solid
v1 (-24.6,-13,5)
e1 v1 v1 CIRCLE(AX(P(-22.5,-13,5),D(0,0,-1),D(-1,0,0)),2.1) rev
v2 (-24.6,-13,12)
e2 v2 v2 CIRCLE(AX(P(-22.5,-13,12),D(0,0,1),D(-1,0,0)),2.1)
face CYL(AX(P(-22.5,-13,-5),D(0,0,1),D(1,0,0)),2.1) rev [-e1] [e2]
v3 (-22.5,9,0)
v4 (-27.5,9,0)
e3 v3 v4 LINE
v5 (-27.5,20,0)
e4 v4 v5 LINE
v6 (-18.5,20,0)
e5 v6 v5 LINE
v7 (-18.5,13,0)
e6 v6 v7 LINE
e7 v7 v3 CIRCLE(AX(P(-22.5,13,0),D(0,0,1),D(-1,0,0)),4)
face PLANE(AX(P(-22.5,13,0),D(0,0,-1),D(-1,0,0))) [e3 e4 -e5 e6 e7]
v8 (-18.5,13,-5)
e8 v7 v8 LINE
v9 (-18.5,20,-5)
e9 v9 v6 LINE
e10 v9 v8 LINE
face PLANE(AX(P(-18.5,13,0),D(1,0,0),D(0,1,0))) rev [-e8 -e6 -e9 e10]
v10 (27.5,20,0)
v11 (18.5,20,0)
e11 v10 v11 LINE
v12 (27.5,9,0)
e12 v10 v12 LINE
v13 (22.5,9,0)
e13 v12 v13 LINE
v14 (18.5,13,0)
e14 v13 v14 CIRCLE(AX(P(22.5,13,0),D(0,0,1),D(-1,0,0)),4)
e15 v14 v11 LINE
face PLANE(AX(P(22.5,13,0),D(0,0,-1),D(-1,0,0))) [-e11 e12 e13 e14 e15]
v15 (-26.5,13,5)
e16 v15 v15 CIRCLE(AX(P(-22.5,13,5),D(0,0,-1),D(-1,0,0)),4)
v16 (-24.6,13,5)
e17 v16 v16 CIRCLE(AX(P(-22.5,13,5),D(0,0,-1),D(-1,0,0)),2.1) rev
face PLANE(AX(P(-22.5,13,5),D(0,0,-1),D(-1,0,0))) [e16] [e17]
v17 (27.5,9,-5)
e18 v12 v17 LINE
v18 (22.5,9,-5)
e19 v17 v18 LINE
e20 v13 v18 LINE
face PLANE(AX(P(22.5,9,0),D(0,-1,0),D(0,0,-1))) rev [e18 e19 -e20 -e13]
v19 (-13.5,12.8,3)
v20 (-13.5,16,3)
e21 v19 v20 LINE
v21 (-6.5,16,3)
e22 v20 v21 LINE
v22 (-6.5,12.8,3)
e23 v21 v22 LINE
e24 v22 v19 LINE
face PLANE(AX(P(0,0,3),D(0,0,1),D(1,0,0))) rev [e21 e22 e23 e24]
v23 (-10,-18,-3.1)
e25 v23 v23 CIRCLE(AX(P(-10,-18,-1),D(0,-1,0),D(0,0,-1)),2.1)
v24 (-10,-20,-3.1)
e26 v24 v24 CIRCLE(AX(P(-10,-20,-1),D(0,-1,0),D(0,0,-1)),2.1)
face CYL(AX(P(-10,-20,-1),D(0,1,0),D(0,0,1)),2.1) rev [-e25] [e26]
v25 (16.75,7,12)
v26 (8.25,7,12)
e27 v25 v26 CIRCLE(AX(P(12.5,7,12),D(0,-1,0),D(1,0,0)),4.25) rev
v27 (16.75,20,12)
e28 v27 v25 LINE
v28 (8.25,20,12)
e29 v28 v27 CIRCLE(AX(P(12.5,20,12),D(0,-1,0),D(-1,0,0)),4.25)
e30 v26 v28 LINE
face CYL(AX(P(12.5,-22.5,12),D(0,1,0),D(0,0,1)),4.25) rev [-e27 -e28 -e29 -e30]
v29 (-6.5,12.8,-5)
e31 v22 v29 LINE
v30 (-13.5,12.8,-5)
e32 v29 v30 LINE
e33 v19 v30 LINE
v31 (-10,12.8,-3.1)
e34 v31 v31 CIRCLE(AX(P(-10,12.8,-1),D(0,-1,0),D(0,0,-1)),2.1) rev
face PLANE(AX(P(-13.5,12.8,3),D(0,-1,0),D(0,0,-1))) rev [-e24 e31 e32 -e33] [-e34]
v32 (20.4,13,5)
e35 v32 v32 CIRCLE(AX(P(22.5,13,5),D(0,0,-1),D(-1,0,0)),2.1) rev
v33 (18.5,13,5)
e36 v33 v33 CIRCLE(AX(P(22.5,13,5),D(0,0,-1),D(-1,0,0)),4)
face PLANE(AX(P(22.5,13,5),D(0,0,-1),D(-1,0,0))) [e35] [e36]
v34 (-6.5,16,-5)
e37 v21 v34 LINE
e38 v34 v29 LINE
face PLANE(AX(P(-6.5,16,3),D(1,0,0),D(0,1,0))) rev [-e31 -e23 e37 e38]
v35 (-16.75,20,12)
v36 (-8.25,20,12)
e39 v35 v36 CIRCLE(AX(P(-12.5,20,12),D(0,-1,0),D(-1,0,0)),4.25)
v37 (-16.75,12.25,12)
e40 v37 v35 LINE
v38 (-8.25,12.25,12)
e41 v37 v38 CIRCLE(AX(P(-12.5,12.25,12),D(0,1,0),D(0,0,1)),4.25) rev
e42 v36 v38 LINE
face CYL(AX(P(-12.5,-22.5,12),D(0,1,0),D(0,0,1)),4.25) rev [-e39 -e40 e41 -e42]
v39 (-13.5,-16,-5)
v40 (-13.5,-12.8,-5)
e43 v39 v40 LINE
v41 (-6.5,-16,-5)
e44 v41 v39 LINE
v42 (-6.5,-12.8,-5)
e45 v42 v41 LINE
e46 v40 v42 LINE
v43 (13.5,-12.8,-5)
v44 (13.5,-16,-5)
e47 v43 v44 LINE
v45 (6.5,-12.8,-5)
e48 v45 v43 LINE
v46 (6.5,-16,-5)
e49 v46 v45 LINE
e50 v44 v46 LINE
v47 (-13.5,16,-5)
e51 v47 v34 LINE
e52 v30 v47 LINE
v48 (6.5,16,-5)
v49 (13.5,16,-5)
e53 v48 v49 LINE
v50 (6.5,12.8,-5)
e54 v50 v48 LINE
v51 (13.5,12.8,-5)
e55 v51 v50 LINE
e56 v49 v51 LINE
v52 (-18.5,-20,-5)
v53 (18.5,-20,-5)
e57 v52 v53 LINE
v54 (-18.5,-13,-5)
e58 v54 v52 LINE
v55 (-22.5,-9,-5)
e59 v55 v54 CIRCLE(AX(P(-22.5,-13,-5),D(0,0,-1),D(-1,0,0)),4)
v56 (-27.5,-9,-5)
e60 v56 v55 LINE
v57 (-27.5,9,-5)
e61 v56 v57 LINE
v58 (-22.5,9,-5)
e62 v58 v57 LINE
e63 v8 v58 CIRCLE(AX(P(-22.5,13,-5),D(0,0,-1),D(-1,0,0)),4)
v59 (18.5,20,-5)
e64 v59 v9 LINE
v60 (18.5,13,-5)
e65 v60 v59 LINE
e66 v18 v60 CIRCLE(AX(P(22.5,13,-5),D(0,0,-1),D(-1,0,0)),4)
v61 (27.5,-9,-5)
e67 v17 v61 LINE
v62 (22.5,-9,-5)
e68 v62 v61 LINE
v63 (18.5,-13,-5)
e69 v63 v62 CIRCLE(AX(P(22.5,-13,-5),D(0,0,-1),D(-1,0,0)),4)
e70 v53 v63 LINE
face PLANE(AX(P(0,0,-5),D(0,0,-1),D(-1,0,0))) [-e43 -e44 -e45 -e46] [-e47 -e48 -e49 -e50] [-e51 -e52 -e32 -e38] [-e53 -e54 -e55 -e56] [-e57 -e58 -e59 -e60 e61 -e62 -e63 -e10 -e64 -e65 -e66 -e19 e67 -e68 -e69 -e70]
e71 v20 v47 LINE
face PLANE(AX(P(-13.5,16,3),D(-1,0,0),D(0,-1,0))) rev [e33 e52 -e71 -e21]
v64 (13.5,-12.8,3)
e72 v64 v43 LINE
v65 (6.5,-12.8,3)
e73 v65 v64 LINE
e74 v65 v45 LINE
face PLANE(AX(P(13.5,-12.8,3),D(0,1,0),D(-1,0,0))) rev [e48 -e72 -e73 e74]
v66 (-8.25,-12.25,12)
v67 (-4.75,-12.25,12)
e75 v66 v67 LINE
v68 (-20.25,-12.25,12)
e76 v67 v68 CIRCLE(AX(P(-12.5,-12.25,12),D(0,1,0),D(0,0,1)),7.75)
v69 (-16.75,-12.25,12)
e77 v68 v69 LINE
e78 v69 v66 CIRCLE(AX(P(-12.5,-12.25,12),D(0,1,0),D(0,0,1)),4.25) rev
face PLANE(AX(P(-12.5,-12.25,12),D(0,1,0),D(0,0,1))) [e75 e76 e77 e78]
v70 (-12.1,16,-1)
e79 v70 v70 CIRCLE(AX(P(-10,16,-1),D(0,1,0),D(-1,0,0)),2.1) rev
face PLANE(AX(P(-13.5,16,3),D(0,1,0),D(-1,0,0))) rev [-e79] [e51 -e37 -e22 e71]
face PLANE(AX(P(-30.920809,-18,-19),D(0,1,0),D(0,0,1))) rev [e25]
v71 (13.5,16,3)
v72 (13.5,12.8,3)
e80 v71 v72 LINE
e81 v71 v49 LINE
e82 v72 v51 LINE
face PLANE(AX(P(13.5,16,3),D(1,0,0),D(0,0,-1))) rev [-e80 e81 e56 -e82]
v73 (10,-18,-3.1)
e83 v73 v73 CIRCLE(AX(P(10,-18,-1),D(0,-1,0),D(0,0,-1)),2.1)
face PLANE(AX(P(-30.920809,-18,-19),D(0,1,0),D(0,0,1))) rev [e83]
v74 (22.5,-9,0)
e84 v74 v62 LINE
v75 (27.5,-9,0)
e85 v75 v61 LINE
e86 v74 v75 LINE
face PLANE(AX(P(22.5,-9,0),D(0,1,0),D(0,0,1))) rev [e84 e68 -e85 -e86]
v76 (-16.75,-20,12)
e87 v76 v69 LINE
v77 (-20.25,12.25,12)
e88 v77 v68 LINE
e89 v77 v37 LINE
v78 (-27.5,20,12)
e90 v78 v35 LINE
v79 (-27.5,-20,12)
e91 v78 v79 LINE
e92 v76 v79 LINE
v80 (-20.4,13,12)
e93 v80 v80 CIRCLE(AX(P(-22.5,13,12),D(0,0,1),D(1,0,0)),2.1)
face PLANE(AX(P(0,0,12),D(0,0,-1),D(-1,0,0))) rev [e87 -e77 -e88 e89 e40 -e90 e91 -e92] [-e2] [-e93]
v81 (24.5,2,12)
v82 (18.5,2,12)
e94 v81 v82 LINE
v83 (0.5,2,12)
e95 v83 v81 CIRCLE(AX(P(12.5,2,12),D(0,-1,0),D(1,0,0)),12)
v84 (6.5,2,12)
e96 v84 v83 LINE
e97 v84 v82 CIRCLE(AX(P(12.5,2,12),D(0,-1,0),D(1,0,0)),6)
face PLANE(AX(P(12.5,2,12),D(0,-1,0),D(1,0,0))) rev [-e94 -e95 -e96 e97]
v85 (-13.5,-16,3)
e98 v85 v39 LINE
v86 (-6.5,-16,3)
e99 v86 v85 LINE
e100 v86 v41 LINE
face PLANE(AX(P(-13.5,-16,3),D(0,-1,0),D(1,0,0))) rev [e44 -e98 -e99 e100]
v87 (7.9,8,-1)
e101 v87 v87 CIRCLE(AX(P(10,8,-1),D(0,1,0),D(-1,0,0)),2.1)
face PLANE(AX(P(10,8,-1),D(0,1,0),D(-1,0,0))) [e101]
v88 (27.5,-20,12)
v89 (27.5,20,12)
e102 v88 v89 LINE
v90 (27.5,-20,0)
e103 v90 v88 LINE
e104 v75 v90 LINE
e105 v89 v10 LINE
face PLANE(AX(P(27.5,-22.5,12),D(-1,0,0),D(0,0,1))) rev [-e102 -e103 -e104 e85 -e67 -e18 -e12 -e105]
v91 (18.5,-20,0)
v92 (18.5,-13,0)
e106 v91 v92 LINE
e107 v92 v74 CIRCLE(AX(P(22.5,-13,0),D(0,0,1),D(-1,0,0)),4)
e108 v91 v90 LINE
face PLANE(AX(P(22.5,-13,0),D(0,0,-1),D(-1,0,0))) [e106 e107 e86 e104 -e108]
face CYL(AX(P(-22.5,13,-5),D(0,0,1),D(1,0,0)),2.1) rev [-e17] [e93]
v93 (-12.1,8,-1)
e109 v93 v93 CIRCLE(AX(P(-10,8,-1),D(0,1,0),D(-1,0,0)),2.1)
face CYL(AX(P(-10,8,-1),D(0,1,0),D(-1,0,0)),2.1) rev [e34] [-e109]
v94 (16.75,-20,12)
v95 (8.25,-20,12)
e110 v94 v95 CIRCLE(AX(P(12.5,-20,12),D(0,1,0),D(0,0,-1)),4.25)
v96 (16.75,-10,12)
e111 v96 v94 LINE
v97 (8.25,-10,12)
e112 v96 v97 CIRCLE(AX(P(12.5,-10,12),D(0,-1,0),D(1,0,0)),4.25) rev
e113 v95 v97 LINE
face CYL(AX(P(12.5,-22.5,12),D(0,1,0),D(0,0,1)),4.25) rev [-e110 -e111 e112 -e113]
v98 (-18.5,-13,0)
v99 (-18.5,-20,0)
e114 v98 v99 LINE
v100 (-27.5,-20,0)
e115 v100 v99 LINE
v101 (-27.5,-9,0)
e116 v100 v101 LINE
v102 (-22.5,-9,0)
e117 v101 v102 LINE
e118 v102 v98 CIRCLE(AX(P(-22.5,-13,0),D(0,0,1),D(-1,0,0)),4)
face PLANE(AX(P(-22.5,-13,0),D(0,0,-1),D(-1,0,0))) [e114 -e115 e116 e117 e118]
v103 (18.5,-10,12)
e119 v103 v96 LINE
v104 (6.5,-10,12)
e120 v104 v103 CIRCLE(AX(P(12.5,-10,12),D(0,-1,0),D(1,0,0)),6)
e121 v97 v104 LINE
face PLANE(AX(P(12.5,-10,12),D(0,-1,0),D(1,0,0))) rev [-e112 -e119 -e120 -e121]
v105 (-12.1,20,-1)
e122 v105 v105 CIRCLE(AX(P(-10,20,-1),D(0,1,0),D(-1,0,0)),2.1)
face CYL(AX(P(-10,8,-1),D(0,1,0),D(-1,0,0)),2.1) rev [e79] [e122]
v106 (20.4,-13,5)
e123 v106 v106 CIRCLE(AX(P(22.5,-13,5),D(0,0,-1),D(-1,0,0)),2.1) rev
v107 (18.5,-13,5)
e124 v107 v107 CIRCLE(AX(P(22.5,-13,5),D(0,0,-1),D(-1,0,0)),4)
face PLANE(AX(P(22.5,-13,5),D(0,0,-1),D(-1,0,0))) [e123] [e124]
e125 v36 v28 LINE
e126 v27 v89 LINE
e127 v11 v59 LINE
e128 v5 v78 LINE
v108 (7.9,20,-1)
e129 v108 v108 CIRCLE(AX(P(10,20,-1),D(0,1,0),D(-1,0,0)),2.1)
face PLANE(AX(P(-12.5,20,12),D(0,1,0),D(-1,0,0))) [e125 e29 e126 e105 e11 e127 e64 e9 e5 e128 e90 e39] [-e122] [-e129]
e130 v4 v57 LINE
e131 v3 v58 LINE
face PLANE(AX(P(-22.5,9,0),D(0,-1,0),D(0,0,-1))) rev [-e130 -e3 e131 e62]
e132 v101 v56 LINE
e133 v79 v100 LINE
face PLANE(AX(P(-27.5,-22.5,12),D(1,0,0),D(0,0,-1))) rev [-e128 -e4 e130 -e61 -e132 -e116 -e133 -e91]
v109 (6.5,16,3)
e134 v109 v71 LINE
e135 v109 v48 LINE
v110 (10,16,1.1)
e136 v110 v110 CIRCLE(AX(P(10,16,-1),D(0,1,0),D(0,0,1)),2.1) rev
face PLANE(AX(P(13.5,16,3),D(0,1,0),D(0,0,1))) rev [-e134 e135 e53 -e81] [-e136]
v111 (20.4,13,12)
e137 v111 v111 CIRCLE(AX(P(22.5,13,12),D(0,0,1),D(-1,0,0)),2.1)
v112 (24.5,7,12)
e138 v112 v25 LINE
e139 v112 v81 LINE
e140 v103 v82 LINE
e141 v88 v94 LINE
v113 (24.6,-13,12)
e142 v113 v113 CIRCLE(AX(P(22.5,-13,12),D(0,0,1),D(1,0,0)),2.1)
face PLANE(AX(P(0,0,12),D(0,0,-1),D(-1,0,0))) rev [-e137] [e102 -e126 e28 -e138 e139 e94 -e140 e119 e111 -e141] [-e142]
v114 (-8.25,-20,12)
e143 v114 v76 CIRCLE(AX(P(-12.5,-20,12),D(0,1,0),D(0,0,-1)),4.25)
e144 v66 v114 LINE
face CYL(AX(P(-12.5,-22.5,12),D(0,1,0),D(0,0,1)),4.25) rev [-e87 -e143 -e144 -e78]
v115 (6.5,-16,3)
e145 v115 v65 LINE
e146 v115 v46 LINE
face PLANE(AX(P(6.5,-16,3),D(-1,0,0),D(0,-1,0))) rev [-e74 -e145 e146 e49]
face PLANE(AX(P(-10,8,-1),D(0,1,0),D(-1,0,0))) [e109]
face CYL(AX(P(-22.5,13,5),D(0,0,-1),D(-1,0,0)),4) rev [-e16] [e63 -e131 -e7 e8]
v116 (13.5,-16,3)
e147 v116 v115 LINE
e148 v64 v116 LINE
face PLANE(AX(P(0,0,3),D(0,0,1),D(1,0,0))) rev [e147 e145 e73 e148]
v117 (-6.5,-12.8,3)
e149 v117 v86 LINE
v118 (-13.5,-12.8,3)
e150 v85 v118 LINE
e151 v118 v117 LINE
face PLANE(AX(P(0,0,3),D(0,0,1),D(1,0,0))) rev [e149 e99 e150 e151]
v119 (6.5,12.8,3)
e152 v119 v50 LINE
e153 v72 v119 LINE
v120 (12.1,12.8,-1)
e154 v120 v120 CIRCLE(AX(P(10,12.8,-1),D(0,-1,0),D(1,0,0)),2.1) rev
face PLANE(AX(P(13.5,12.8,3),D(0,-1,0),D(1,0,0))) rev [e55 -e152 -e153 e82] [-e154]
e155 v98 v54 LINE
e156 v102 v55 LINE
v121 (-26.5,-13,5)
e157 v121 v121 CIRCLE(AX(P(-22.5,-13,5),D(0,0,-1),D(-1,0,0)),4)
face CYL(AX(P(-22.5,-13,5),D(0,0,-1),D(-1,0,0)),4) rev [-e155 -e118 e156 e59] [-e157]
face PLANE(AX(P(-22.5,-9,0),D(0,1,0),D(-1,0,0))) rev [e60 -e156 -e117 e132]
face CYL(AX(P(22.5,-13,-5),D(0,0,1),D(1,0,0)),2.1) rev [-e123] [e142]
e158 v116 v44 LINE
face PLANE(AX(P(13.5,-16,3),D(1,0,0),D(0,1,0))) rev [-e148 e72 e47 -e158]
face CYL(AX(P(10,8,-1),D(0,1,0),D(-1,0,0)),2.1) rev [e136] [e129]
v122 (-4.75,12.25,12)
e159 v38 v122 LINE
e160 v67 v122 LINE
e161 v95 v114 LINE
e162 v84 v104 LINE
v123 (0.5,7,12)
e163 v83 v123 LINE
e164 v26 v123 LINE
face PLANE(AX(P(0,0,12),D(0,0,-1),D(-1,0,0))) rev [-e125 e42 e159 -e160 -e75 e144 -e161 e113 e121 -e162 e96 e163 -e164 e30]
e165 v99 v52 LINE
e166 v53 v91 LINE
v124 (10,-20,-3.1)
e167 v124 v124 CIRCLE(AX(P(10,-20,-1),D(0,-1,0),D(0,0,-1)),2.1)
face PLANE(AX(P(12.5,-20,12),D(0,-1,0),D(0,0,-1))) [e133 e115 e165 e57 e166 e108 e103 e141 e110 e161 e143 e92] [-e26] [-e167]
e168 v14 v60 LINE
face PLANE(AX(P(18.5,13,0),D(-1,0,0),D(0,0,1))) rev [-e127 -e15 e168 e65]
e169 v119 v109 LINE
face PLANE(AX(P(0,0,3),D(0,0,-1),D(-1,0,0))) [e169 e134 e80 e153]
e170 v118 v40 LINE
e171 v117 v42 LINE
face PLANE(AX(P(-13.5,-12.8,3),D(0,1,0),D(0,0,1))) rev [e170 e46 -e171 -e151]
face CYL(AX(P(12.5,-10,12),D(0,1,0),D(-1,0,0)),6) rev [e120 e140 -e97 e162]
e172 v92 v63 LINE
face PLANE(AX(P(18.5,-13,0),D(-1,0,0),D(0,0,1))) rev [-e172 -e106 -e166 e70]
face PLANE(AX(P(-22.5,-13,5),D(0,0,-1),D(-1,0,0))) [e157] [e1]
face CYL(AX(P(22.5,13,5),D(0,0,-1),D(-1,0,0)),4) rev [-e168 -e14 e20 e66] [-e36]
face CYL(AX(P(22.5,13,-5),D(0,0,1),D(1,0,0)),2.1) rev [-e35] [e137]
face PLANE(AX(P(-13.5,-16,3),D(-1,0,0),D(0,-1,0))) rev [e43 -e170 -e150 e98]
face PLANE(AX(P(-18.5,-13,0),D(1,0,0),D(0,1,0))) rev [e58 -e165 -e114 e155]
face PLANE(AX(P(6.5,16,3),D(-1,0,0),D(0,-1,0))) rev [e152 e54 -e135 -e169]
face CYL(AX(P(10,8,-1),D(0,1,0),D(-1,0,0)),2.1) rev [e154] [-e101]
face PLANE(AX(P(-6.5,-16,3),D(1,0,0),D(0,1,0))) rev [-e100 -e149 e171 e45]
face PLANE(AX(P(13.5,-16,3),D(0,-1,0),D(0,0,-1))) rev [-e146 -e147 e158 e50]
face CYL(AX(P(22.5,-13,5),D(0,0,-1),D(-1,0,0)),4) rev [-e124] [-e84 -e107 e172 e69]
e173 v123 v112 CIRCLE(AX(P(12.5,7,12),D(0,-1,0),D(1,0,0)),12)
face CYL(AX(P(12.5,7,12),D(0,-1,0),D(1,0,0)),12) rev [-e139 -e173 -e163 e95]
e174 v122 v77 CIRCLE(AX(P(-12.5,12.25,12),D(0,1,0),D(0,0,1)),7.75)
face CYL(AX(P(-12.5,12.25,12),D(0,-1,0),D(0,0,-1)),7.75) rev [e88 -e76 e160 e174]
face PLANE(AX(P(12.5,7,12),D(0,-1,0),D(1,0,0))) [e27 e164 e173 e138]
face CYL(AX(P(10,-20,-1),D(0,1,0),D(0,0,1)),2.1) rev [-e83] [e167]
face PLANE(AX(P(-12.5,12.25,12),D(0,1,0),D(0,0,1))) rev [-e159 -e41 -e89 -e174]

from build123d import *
from build123d.topology import SkipClean

# Parameters (mm, degrees)
ESQUISSE1_W                  = 55
ESQUISSE1_H                  = 45
BOSS_EXTRU_1_DEPTH           = 12
ESQUISSE2_R                  = 4.25
ENL_V_MAT_EXTRU_1_DEPTH      = 55.085580333
ENL_V_MAT_EXTRU_2_DEPTH      = 12.25
ENL_V_MAT_EXTRU_2_DEPTH_BACK = 12.25
ESQUISSE3_R                  = 7.75
ESQUISSE9_W                  = 61.062756781
ESQUISSE9_H                  = 12.22812859
ESQUISSE9_W_2                = 59.427147224
ESQUISSE9_H_2                = 8.100161614
ENL_V_MAT_EXTRU_7_DEPTH      = 31
SKETCH1_W                    = 55
SKETCH1_H                    = 36
BOSS_EXTRUDE1_DEPTH          = 5
SKETCH2_R                    = 2.1
CUT_EXTRUDE1_DEPTH           = 38.003378224
SKETCH3_R                    = 4
CUT_EXTRUDE2_DEPTH           = 10
CUT_EXTRUDE3_DEPTH           = 5
SKETCH5_R                    = 2.1
CUT_EXTRUDE4_DEPTH           = 10
BOSS_EXTRUDE4_START          = 2
SKETCH7_R                    = 2.1
BOSS_EXTRUDE4_DEPTH          = 2
SKETCH8_R                    = 2.1
BOSS_EXTRUDE5_DEPTH          = 2
SKETCH9_W                    = 7
SKETCH9_H                    = 3.2
CUT_EXTRUDE6_DEPTH           = 8
ESQUISSE12_R                 = 6
ENL_V_MAT_EXTRU_9_DEPTH      = 12
ESQUISSE13_R                 = 12
ENL_V_MAT_EXTRU_10_DEPTH     = 5


with BuildPart() as part:
    # Esquisse1 → Boss.-Extru.1 (new body)
    with BuildSketch(Plane.XY):
        Rectangle(ESQUISSE1_W, ESQUISSE1_H)
    extrude(amount=BOSS_EXTRU_1_DEPTH)

    # Esquisse2 → Enlèv. mat.-Extru.1 (cut, through all)
    with BuildSketch(Plane(origin=(0, 22.5, 0), x_dir=(1, 0, 0), z_dir=(0, 1, 0))):
        with Locations((-12.5, -12)):
            Circle(ESQUISSE2_R)
        with Locations((12.5, -12)):
            Circle(ESQUISSE2_R)
    extrude(amount=-ENL_V_MAT_EXTRU_1_DEPTH, mode=Mode.SUBTRACT)

    # Esquisse3 → Enlèv. mat.-Extru.2 (cut, two sides: drawn at the far end of the back side and taken through both)
    with BuildSketch(Plane(origin=(0, 0, 0), x_dir=(1, 0, 0), z_dir=(0, 1, 0)).offset(-ENL_V_MAT_EXTRU_2_DEPTH_BACK)):
        with Locations((-12.5, -12)):
            Circle(ESQUISSE3_R)
    extrude(amount=ENL_V_MAT_EXTRU_2_DEPTH + ENL_V_MAT_EXTRU_2_DEPTH_BACK, mode=Mode.SUBTRACT)

    # Esquisse9 → Enlèv. mat.-Extru.7 (cut)
    with BuildSketch(Plane.XY.offset(12)):
        with Locations((-0.389430846, -24.114064295)):
            Rectangle(ESQUISSE9_W, ESQUISSE9_H)
        with Locations((1.674552641, 22.050080807)):
            Rectangle(ESQUISSE9_W_2, ESQUISSE9_H_2)
    extrude(amount=-ENL_V_MAT_EXTRU_7_DEPTH, mode=Mode.SUBTRACT)

    # Sketch1 → Boss-Extrude1 (add)
    with BuildSketch(Plane(origin=(0, 0, 0), x_dir=(-1, 0, 0), z_dir=(0, 0, -1))):
        Rectangle(SKETCH1_W, SKETCH1_H)
    extrude(amount=BOSS_EXTRUDE1_DEPTH)

    # Sketch2 → Cut-Extrude1 (cut, through all)
    with BuildSketch(Plane.XY.offset(12)):
        with Locations((-22.5, 13)):
            Circle(SKETCH2_R)
        with Locations((22.5, 13)):
            Circle(SKETCH2_R)
        with Locations((22.5, -13)):
            Circle(SKETCH2_R)
        with Locations((-22.5, -13)):
            Circle(SKETCH2_R)
    extrude(amount=-CUT_EXTRUDE1_DEPTH, mode=Mode.SUBTRACT)

    # Sketch3 → Cut-Extrude2 (cut)
    with BuildSketch(Plane(origin=(0, 0, -5), x_dir=(-1, 0, 0), z_dir=(0, 0, -1))):
        with Locations((-22.5, 13)):
            Circle(SKETCH3_R)
        with Locations((22.5, 13)):
            Circle(SKETCH3_R)
        with Locations((22.5, -13)):
            Circle(SKETCH3_R)
        with Locations((-22.5, -13)):
            Circle(SKETCH3_R)
    extrude(amount=-CUT_EXTRUDE2_DEPTH, mode=Mode.SUBTRACT)

    # Sketch4 → Cut-Extrude3 (cut)
    with BuildSketch(Plane(origin=(0, 0, -5), x_dir=(-1, 0, 0), z_dir=(0, 0, -1))):
        with BuildLine():
            Line((-18.5, 13), (-18.5, 18))
            Line((-18.5, 18), (-27.5, 18))
            Line((-27.5, 18), (-27.5, 9))
            Line((-27.5, 9), (-22.5, 9))
            ThreePointArc((-22.5, 9), (-25.328427125, 15.828427125), (-18.5, 13))
        make_face()
        with BuildLine():
            Line((-22.5, -9), (-27.5, -9))
            Line((-27.5, -9), (-27.5, -18))
            Line((-27.5, -18), (-18.5, -18))
            Line((-18.5, -18), (-18.5, -13))
            ThreePointArc((-18.5, -13), (-25.328427125, -15.828427125), (-22.5, -9))
        make_face()
        with BuildLine():
            Line((27.5, -18), (27.5, -9))
            Line((27.5, -9), (22.5, -9))
            ThreePointArc((22.5, -9), (25.328427125, -15.828427125), (18.5, -13))
            Line((18.5, -13), (18.5, -18))
            Line((18.5, -18), (27.5, -18))
        make_face()
        with BuildLine():
            Line((27.5, 18), (18.5, 18))
            Line((18.5, 18), (18.5, 13))
            ThreePointArc((18.5, 13), (25.328427125, 15.828427125), (22.5, 9))
            Line((22.5, 9), (27.5, 9))
            Line((27.5, 9), (27.5, 18))
        make_face()
    extrude(amount=-CUT_EXTRUDE3_DEPTH, mode=Mode.SUBTRACT)

    # Sketch5 → Cut-Extrude4 (cut)
    with BuildSketch(Plane(origin=(0, 18, 0), x_dir=(1, 0, 0), z_dir=(0, 1, 0))):
        with Locations((-10, 1)):
            Circle(SKETCH5_R)
        with Locations((10, 1)):
            Circle(SKETCH5_R)
    extrude(amount=-CUT_EXTRUDE4_DEPTH, mode=Mode.SUBTRACT)

    # Sketch7 → Boss-Extrude4 (add)
    with SkipClean():  # the faces are left unmerged after this step: merging them gives an invalid solid
        with BuildSketch(Plane(origin=(0, 18, 0), x_dir=(1, 0, 0), z_dir=(0, 1, 0)).offset(BOSS_EXTRUDE4_START)):
            with BuildLine():
                Line((18.5, 5), (-18.5, 5))
                Line((-18.5, 5), (-18.5, 0))
                Line((-18.5, 0), (-27.5, 0))
                Line((-27.5, 0), (-27.5, -12))
                Line((-27.5, -12), (-16.75, -12))
                ThreePointArc((-16.75, -12), (-12.5, -7.75), (-8.25, -12))
                Line((-8.25, -12), (8.25, -12))
                ThreePointArc((8.25, -12), (12.5, -7.75), (16.75, -12))
                Line((16.75, -12), (27.5, -12))
                Line((27.5, -12), (27.5, 0))
                Line((27.5, 0), (18.5, 0))
                Line((18.5, 0), (18.5, 5))
            make_face()
            with Locations((10, 1)):
                Circle(SKETCH7_R, mode=Mode.SUBTRACT)
            with Locations((-10, 1)):
                Circle(SKETCH7_R, mode=Mode.SUBTRACT)
        extrude(amount=-BOSS_EXTRUDE4_DEPTH)
    add(part.part.scale(1), mode=Mode.REPLACE)  # the faces are merged on a copy

    # Sketch8 → Boss-Extrude5 (add)
    with BuildSketch(Plane.XZ.offset(18)):
        with BuildLine():
            Line((-27.5, 0), (-18.5, 0))
            Line((-18.5, 0), (-18.5, -5))
            Line((-18.5, -5), (18.5, -5))
            Line((18.5, -5), (18.5, 0))
            Line((18.5, 0), (27.5, 0))
            Line((27.5, 0), (27.5, 12))
            Line((27.5, 12), (16.75, 12))
            ThreePointArc((16.75, 12), (12.5, 7.75), (8.25, 12))
            Line((8.25, 12), (-8.25, 12))
            ThreePointArc((-8.25, 12), (-12.5, 7.75), (-16.75, 12))
            Line((-16.75, 12), (-27.5, 12))
            Line((-27.5, 12), (-27.5, 0))
        make_face()
        with Locations((10, -1)):
            Circle(SKETCH8_R, mode=Mode.SUBTRACT)
        with Locations((-10, -1)):
            Circle(SKETCH8_R, mode=Mode.SUBTRACT)
    extrude(amount=BOSS_EXTRUDE5_DEPTH)

    # Sketch9 → Cut-Extrude6 (cut)
    with BuildSketch(Plane(origin=(0, 0, -5), x_dir=(-1, 0, 0), z_dir=(0, 0, -1))):
        with Locations((-10, 14.4)):
            Rectangle(SKETCH9_W, SKETCH9_H)
        with Locations((10, 14.4)):
            Rectangle(SKETCH9_W, SKETCH9_H)
        with Locations((10, -14.4)):
            Rectangle(SKETCH9_W, SKETCH9_H)
        with Locations((-10, -14.4)):
            Rectangle(SKETCH9_W, SKETCH9_H)
    extrude(amount=-CUT_EXTRUDE6_DEPTH, mode=Mode.SUBTRACT)

    # Esquisse12 → Enlèv. mat.-Extru.9 (cut)
    with BuildSketch(Plane(origin=(0, 2, 0), x_dir=(-1, 0, 0), z_dir=(0, -1, 0))):
        with Locations((-12.5, -12)):
            Circle(ESQUISSE12_R)
    extrude(amount=ENL_V_MAT_EXTRU_9_DEPTH, mode=Mode.SUBTRACT)

    # Esquisse13 → Enlèv. mat.-Extru.10 (cut)
    with BuildSketch(Plane(origin=(0, 2, 0), x_dir=(-1, 0, 0), z_dir=(0, -1, 0))):
        with Locations((-12.5, -12)):
            Circle(ESQUISSE13_R)
    extrude(amount=-ENL_V_MAT_EXTRU_10_DEPTH, mode=Mode.SUBTRACT)


solid = part.part
